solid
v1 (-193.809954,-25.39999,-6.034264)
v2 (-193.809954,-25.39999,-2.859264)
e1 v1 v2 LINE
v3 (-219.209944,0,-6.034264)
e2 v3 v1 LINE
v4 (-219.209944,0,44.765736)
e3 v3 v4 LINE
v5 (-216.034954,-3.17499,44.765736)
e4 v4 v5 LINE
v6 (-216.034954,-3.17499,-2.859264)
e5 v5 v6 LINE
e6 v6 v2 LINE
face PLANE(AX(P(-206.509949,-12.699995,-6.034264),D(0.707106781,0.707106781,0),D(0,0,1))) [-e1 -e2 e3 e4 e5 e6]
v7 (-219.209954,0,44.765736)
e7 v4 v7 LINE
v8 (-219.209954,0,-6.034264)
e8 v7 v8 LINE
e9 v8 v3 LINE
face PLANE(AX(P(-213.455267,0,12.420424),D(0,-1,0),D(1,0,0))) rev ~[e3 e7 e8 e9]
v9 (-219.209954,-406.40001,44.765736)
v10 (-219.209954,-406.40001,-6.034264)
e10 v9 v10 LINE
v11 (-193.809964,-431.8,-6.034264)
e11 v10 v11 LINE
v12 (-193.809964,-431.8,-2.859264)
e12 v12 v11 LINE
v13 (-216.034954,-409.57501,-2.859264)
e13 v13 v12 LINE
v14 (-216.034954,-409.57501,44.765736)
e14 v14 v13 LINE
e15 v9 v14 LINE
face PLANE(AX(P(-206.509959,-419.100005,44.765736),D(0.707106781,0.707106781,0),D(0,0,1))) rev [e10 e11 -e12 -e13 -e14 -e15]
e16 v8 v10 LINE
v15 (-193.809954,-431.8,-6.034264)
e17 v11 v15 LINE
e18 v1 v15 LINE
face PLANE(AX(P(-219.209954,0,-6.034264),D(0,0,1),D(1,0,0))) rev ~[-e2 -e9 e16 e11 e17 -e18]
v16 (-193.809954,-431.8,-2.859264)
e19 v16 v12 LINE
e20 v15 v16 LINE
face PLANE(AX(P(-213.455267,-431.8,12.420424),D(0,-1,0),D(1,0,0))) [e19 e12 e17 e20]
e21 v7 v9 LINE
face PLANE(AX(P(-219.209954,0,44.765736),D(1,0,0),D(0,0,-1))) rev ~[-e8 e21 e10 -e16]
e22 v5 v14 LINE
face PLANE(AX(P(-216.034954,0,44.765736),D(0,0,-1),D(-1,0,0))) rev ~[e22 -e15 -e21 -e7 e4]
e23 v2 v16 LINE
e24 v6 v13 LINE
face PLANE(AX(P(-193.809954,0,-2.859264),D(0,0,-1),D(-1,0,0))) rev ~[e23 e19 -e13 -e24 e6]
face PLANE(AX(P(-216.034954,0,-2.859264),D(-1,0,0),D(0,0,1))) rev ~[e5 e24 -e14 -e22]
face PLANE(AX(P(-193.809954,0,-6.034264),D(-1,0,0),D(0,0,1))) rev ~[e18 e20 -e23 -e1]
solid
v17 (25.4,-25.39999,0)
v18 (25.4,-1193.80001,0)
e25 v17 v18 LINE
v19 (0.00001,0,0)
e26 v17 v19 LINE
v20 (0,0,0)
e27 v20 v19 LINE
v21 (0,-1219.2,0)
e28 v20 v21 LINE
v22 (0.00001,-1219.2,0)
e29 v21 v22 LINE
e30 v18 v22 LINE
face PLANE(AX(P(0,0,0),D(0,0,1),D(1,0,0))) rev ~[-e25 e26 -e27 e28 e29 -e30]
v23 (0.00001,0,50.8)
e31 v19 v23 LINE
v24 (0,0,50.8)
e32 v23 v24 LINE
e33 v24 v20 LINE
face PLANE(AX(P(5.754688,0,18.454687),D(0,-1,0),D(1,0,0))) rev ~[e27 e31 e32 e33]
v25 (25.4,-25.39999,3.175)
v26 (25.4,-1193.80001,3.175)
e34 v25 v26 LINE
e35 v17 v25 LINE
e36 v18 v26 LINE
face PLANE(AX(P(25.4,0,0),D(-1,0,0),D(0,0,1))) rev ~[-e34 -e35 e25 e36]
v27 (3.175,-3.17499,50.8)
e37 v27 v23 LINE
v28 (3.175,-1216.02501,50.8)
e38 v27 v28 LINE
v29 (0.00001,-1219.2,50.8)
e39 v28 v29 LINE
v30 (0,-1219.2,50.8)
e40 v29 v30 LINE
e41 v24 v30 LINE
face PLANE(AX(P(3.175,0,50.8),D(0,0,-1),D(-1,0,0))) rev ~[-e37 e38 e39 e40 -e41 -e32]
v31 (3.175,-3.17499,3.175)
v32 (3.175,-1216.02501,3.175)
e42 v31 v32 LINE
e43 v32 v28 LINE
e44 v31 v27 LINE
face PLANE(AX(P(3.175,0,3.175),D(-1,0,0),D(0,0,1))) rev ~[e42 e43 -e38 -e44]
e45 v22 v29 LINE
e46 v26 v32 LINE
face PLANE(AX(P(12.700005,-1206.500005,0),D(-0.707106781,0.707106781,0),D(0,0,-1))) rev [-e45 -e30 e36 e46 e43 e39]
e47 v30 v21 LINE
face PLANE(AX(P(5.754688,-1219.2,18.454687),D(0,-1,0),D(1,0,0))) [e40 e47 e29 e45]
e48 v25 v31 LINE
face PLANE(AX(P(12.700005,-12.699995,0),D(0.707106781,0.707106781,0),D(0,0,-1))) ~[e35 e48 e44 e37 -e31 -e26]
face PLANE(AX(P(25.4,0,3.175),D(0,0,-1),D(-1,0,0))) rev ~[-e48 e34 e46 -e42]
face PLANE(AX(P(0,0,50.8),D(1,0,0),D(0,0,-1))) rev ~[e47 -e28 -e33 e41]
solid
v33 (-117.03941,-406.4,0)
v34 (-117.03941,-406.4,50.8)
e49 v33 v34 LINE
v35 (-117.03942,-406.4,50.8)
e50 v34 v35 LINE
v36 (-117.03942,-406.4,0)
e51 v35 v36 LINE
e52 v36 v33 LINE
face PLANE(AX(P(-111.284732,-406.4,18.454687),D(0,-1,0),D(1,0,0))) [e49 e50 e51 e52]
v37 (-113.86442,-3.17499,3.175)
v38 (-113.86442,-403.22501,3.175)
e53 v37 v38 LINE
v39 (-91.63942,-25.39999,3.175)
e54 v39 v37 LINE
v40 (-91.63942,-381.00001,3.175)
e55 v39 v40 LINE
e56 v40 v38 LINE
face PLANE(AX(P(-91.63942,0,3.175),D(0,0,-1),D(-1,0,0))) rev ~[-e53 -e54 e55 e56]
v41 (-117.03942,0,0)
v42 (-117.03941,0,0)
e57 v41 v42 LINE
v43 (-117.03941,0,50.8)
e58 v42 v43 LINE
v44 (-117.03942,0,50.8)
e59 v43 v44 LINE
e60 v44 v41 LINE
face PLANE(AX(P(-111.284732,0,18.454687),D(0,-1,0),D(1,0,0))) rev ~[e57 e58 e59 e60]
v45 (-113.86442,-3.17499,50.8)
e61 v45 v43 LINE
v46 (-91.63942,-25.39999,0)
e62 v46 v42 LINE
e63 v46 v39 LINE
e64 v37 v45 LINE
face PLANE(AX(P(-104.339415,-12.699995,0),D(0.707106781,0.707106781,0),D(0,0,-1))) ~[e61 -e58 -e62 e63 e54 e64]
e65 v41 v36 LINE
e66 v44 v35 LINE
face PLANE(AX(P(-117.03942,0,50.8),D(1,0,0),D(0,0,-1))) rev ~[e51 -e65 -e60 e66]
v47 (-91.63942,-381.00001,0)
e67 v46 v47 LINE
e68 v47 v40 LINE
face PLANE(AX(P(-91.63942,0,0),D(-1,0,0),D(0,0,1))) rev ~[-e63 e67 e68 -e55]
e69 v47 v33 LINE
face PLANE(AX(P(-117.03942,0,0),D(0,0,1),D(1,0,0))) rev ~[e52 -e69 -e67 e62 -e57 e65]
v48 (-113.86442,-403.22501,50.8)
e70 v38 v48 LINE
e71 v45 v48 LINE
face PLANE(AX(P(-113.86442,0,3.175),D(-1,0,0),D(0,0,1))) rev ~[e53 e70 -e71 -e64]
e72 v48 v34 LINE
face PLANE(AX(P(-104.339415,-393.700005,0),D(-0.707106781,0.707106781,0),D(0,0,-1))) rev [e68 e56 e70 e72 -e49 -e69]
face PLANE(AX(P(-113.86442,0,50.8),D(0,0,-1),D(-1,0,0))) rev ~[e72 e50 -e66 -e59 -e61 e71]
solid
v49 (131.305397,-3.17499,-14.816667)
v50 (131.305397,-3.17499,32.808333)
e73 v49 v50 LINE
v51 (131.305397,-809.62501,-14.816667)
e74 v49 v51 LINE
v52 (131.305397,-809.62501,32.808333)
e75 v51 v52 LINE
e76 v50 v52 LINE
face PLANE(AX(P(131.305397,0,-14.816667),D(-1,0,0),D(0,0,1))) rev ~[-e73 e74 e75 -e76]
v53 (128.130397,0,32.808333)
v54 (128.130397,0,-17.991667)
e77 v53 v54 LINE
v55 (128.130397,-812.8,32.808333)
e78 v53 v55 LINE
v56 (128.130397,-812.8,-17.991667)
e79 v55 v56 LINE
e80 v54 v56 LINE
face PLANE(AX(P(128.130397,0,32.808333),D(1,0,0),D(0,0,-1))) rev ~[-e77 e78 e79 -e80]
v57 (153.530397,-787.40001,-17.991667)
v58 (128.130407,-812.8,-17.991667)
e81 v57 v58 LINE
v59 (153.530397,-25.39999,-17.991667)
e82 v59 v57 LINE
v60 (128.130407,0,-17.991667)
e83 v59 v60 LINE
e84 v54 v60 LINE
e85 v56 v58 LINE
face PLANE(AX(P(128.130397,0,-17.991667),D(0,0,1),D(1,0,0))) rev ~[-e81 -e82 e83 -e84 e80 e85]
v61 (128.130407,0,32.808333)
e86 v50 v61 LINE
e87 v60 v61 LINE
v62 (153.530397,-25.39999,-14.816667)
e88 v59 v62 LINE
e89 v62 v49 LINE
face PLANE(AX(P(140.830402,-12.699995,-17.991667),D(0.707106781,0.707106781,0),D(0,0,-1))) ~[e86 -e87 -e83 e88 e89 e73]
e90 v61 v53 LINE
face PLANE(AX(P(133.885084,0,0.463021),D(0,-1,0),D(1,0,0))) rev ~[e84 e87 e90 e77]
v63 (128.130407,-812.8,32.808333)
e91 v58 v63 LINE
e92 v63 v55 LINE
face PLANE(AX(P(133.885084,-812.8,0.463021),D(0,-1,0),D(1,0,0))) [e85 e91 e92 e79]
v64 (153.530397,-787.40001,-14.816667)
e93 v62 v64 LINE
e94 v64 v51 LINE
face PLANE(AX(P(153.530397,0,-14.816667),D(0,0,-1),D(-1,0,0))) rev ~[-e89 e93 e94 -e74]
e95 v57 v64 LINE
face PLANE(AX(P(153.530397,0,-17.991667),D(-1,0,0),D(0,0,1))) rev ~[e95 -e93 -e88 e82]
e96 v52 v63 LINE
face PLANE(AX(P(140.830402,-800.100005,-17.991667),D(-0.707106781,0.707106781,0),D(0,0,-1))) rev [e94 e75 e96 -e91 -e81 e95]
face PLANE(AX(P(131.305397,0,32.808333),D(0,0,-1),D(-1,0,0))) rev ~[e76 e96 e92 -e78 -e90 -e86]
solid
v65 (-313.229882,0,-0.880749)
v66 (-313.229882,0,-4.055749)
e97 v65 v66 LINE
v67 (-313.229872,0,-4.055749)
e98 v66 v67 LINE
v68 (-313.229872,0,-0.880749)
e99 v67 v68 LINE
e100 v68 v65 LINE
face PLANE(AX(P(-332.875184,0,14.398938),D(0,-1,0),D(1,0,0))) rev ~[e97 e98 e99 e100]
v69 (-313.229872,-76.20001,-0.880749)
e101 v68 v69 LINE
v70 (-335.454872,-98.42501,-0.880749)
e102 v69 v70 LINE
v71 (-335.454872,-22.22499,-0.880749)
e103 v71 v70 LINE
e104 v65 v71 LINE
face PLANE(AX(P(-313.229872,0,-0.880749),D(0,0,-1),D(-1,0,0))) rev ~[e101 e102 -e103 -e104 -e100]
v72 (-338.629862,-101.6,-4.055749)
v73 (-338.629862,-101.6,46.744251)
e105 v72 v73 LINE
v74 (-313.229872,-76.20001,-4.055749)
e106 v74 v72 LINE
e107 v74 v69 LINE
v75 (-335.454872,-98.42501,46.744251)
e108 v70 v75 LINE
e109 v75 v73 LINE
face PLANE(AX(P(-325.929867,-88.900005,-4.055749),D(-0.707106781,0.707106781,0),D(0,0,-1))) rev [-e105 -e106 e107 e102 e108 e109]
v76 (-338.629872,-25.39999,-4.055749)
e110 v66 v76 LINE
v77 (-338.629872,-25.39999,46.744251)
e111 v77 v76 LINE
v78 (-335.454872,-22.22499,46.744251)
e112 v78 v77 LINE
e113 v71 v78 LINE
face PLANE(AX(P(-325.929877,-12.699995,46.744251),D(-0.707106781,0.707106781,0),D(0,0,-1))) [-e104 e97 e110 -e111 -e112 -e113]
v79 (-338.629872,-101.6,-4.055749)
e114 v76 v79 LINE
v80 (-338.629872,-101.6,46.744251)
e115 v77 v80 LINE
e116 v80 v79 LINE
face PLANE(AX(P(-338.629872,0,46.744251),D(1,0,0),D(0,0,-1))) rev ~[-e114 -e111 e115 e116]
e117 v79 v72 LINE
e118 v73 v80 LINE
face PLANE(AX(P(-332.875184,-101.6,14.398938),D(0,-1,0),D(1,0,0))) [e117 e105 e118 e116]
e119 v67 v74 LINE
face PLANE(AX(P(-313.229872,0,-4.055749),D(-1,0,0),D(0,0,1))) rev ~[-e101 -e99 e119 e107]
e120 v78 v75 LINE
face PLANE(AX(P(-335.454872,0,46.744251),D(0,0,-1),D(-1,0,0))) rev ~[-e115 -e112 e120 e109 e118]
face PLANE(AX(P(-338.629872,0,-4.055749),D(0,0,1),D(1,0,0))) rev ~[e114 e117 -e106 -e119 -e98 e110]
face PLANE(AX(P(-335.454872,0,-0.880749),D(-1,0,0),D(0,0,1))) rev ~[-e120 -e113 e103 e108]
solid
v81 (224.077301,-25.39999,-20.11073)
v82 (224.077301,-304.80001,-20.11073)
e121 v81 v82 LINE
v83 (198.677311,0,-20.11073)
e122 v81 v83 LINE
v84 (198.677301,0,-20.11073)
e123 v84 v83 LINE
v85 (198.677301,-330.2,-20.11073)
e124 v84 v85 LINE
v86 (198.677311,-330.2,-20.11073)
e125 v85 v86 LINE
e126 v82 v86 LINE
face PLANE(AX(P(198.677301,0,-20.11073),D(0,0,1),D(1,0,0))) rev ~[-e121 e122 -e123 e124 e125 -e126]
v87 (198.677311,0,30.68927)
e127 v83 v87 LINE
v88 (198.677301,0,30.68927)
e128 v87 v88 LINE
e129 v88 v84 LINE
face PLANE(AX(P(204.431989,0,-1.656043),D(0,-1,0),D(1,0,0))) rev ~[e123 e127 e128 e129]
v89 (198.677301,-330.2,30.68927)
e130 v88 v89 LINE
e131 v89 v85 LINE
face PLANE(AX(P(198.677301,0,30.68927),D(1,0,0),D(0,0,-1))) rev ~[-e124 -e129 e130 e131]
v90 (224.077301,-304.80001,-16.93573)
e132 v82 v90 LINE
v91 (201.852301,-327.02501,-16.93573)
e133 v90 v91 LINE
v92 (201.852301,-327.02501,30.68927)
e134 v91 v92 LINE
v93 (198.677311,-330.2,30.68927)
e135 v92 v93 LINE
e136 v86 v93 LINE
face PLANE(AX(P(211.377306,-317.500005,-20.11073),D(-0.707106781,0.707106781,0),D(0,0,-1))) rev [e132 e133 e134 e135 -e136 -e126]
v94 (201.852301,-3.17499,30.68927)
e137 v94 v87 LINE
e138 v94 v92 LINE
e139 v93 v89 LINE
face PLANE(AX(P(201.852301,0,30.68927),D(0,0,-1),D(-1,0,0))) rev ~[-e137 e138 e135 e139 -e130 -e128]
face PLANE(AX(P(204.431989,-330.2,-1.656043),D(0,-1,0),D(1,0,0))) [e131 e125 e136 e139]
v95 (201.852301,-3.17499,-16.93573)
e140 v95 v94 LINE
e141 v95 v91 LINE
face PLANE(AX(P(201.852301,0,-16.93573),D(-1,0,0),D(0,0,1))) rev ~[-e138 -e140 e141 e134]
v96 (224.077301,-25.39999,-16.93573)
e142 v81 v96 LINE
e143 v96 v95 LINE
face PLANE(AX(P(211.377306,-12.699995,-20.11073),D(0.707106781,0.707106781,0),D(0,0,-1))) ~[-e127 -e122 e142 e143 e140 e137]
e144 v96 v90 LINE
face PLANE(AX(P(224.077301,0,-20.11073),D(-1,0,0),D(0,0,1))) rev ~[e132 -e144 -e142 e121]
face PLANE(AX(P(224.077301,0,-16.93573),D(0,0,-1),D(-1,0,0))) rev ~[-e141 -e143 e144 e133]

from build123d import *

# Parameters (mm, degrees)
F1_DEPTH  = 1219.2
F3_DEPTH  = 406.4
F4_SIZE   = 25.39999
F4_2_SIZE = 25.39999
F6_DEPTH  = 812.8
F8_DEPTH  = 330.2
F9_SIZE   = 25.39999
F9_2_SIZE = 25.39999
F11_DEPTH = 431.8
F13_DEPTH = 101.6
F14_SIZE  = 25.39999
F15_SIZE  = 25.39999
F16_SIZE  = 25.39999
F17_SIZE  = 25.39999


# Not quite as in the source:
# - a fillet or chamfer is up to 0.001 mm smaller than in the source, because OpenCascade refuses the exact size


with BuildPart() as f1:
    # F0 (on Front) → F1 (new body)
    with BuildSketch(Plane.XZ):
        Polygon((0, 50.8), (0, 0), (25.4, 0), (25.4, 3.175), (3.175, 3.175), (3.175, 50.8), align=None)
    extrude(amount=F1_DEPTH)

    # F4#2 (size 25.4 in the source; OpenCascade refuses exactly that, so slightly less here)
    f4_2_edges = [f1.edges().sort_by_distance(p)[0] for p in [
        (25.4, -1219.2, 1.5875),
        (25.4, 0, 1.5875),
    ]]
    chamfer(f4_2_edges, length=F4_2_SIZE)


with BuildPart() as f3:
    # F2 (on Front) → F3 (new body)
    with BuildSketch(Plane.XZ):
        Polygon((-117.0394197106, 50.8), (-117.0394197106, 0), (-91.6394197106, 0), (-91.6394197106, 3.175), (-113.8644197106, 3.175), (-113.8644197106, 50.8), align=None)
    extrude(amount=F3_DEPTH)

    # F4 (size 25.4 in the source; OpenCascade refuses exactly that, so slightly less here)
    f4_edges = [f3.edges().sort_by_distance(p)[0] for p in [
        (-91.63942, -406.4, 1.5875),
        (-91.63942, 0, 1.5875),
    ]]
    chamfer(f4_edges, length=F4_SIZE)


with BuildPart() as f6:
    # F5 (on Front) → F6 (new body)
    with BuildSketch(Plane.XZ):
        Polygon((128.1303969458, 32.8083333333), (128.1303969458, -17.9916666667), (153.5303969458, -17.9916666667), (153.5303969458, -14.8166666667), (131.3053969458, -14.8166666667), (131.3053969458, 32.8083333333), align=None)
    extrude(amount=F6_DEPTH)

    # F9 (size 25.4 in the source; OpenCascade refuses exactly that, so slightly less here)
    f9_edges = [f6.edges().sort_by_distance(p)[0] for p in [
        (153.530397, 0, -16.404167),
        (153.530397, -812.8, -16.404167),
    ]]
    chamfer(f9_edges, length=F9_SIZE)


with BuildPart() as f8:
    # F7 (on Front) → F8 (new body)
    with BuildSketch(Plane.XZ):
        Polygon((198.6773014069, 30.6892699182), (198.6773014069, -20.1107300818), (224.0773014069, -20.1107300818), (224.0773014069, -16.9357300818), (201.8523014069, -16.9357300818), (201.8523014069, 30.6892699182), align=None)
    extrude(amount=F8_DEPTH)

    # F9#2 (size 25.4 in the source; OpenCascade refuses exactly that, so slightly less here)
    f9_2_edges = [f8.edges().sort_by_distance(p)[0] for p in [
        (224.077301, 0, -18.52323),
        (224.077301, -330.2, -18.52323),
    ]]
    chamfer(f9_2_edges, length=F9_2_SIZE)


with BuildPart() as f11:
    # F10 (on Front) → F11 (new body)
    with BuildSketch(Plane.XZ):
        Polygon((-219.2099541426, 44.7657361247), (-219.2099541426, -6.0342638753), (-193.8099541426, -6.0342638753), (-193.8099541426, -2.8592638753), (-216.0349541426, -2.8592638753), (-216.0349541426, 44.7657361247), align=None)
    extrude(amount=F11_DEPTH)

    # F14 (size 25.4 in the source; OpenCascade refuses exactly that, so slightly less here)
    f14_edges = [f11.edges().sort_by_distance(p)[0] for p in [
        (-219.209954, -431.8, 19.365736),
    ]]
    chamfer(f14_edges, length=F14_SIZE)

    # F15 (size 25.4 in the source; OpenCascade refuses exactly that, so slightly less here)
    f15_edges = [f11.edges().sort_by_distance(p)[0] for p in [
        (-193.809954, 0, -4.446764),
    ]]
    chamfer(f15_edges, length=F15_SIZE)


with BuildPart() as f13:
    # F12 (on Front) → F13 (new body)
    with BuildSketch(Plane.XZ):
        Polygon((-338.6298716068, 46.7442508407), (-338.6298716068, -4.0557491593), (-313.2298716068, -4.0557491593), (-313.2298716068, -0.8807491593), (-335.4548716068, -0.8807491593), (-335.4548716068, 46.7442508407), align=None)
    extrude(amount=F13_DEPTH)

    # F16 (size 25.4 in the source; OpenCascade refuses exactly that, so slightly less here)
    f16_edges = [f13.edges().sort_by_distance(p)[0] for p in [
        (-313.229872, -101.6, -2.468249),
    ]]
    chamfer(f16_edges, length=F16_SIZE)

    # F17 (size 25.4 in the source; OpenCascade refuses exactly that, so slightly less here)
    f17_edges = [f13.edges().sort_by_distance(p)[0] for p in [
        (-338.629872, 0, 21.344251),
    ]]
    chamfer(f17_edges, length=F17_SIZE)


solid = Compound([f1.part, f3.part, f6.part, f8.part, f11.part, f13.part])
